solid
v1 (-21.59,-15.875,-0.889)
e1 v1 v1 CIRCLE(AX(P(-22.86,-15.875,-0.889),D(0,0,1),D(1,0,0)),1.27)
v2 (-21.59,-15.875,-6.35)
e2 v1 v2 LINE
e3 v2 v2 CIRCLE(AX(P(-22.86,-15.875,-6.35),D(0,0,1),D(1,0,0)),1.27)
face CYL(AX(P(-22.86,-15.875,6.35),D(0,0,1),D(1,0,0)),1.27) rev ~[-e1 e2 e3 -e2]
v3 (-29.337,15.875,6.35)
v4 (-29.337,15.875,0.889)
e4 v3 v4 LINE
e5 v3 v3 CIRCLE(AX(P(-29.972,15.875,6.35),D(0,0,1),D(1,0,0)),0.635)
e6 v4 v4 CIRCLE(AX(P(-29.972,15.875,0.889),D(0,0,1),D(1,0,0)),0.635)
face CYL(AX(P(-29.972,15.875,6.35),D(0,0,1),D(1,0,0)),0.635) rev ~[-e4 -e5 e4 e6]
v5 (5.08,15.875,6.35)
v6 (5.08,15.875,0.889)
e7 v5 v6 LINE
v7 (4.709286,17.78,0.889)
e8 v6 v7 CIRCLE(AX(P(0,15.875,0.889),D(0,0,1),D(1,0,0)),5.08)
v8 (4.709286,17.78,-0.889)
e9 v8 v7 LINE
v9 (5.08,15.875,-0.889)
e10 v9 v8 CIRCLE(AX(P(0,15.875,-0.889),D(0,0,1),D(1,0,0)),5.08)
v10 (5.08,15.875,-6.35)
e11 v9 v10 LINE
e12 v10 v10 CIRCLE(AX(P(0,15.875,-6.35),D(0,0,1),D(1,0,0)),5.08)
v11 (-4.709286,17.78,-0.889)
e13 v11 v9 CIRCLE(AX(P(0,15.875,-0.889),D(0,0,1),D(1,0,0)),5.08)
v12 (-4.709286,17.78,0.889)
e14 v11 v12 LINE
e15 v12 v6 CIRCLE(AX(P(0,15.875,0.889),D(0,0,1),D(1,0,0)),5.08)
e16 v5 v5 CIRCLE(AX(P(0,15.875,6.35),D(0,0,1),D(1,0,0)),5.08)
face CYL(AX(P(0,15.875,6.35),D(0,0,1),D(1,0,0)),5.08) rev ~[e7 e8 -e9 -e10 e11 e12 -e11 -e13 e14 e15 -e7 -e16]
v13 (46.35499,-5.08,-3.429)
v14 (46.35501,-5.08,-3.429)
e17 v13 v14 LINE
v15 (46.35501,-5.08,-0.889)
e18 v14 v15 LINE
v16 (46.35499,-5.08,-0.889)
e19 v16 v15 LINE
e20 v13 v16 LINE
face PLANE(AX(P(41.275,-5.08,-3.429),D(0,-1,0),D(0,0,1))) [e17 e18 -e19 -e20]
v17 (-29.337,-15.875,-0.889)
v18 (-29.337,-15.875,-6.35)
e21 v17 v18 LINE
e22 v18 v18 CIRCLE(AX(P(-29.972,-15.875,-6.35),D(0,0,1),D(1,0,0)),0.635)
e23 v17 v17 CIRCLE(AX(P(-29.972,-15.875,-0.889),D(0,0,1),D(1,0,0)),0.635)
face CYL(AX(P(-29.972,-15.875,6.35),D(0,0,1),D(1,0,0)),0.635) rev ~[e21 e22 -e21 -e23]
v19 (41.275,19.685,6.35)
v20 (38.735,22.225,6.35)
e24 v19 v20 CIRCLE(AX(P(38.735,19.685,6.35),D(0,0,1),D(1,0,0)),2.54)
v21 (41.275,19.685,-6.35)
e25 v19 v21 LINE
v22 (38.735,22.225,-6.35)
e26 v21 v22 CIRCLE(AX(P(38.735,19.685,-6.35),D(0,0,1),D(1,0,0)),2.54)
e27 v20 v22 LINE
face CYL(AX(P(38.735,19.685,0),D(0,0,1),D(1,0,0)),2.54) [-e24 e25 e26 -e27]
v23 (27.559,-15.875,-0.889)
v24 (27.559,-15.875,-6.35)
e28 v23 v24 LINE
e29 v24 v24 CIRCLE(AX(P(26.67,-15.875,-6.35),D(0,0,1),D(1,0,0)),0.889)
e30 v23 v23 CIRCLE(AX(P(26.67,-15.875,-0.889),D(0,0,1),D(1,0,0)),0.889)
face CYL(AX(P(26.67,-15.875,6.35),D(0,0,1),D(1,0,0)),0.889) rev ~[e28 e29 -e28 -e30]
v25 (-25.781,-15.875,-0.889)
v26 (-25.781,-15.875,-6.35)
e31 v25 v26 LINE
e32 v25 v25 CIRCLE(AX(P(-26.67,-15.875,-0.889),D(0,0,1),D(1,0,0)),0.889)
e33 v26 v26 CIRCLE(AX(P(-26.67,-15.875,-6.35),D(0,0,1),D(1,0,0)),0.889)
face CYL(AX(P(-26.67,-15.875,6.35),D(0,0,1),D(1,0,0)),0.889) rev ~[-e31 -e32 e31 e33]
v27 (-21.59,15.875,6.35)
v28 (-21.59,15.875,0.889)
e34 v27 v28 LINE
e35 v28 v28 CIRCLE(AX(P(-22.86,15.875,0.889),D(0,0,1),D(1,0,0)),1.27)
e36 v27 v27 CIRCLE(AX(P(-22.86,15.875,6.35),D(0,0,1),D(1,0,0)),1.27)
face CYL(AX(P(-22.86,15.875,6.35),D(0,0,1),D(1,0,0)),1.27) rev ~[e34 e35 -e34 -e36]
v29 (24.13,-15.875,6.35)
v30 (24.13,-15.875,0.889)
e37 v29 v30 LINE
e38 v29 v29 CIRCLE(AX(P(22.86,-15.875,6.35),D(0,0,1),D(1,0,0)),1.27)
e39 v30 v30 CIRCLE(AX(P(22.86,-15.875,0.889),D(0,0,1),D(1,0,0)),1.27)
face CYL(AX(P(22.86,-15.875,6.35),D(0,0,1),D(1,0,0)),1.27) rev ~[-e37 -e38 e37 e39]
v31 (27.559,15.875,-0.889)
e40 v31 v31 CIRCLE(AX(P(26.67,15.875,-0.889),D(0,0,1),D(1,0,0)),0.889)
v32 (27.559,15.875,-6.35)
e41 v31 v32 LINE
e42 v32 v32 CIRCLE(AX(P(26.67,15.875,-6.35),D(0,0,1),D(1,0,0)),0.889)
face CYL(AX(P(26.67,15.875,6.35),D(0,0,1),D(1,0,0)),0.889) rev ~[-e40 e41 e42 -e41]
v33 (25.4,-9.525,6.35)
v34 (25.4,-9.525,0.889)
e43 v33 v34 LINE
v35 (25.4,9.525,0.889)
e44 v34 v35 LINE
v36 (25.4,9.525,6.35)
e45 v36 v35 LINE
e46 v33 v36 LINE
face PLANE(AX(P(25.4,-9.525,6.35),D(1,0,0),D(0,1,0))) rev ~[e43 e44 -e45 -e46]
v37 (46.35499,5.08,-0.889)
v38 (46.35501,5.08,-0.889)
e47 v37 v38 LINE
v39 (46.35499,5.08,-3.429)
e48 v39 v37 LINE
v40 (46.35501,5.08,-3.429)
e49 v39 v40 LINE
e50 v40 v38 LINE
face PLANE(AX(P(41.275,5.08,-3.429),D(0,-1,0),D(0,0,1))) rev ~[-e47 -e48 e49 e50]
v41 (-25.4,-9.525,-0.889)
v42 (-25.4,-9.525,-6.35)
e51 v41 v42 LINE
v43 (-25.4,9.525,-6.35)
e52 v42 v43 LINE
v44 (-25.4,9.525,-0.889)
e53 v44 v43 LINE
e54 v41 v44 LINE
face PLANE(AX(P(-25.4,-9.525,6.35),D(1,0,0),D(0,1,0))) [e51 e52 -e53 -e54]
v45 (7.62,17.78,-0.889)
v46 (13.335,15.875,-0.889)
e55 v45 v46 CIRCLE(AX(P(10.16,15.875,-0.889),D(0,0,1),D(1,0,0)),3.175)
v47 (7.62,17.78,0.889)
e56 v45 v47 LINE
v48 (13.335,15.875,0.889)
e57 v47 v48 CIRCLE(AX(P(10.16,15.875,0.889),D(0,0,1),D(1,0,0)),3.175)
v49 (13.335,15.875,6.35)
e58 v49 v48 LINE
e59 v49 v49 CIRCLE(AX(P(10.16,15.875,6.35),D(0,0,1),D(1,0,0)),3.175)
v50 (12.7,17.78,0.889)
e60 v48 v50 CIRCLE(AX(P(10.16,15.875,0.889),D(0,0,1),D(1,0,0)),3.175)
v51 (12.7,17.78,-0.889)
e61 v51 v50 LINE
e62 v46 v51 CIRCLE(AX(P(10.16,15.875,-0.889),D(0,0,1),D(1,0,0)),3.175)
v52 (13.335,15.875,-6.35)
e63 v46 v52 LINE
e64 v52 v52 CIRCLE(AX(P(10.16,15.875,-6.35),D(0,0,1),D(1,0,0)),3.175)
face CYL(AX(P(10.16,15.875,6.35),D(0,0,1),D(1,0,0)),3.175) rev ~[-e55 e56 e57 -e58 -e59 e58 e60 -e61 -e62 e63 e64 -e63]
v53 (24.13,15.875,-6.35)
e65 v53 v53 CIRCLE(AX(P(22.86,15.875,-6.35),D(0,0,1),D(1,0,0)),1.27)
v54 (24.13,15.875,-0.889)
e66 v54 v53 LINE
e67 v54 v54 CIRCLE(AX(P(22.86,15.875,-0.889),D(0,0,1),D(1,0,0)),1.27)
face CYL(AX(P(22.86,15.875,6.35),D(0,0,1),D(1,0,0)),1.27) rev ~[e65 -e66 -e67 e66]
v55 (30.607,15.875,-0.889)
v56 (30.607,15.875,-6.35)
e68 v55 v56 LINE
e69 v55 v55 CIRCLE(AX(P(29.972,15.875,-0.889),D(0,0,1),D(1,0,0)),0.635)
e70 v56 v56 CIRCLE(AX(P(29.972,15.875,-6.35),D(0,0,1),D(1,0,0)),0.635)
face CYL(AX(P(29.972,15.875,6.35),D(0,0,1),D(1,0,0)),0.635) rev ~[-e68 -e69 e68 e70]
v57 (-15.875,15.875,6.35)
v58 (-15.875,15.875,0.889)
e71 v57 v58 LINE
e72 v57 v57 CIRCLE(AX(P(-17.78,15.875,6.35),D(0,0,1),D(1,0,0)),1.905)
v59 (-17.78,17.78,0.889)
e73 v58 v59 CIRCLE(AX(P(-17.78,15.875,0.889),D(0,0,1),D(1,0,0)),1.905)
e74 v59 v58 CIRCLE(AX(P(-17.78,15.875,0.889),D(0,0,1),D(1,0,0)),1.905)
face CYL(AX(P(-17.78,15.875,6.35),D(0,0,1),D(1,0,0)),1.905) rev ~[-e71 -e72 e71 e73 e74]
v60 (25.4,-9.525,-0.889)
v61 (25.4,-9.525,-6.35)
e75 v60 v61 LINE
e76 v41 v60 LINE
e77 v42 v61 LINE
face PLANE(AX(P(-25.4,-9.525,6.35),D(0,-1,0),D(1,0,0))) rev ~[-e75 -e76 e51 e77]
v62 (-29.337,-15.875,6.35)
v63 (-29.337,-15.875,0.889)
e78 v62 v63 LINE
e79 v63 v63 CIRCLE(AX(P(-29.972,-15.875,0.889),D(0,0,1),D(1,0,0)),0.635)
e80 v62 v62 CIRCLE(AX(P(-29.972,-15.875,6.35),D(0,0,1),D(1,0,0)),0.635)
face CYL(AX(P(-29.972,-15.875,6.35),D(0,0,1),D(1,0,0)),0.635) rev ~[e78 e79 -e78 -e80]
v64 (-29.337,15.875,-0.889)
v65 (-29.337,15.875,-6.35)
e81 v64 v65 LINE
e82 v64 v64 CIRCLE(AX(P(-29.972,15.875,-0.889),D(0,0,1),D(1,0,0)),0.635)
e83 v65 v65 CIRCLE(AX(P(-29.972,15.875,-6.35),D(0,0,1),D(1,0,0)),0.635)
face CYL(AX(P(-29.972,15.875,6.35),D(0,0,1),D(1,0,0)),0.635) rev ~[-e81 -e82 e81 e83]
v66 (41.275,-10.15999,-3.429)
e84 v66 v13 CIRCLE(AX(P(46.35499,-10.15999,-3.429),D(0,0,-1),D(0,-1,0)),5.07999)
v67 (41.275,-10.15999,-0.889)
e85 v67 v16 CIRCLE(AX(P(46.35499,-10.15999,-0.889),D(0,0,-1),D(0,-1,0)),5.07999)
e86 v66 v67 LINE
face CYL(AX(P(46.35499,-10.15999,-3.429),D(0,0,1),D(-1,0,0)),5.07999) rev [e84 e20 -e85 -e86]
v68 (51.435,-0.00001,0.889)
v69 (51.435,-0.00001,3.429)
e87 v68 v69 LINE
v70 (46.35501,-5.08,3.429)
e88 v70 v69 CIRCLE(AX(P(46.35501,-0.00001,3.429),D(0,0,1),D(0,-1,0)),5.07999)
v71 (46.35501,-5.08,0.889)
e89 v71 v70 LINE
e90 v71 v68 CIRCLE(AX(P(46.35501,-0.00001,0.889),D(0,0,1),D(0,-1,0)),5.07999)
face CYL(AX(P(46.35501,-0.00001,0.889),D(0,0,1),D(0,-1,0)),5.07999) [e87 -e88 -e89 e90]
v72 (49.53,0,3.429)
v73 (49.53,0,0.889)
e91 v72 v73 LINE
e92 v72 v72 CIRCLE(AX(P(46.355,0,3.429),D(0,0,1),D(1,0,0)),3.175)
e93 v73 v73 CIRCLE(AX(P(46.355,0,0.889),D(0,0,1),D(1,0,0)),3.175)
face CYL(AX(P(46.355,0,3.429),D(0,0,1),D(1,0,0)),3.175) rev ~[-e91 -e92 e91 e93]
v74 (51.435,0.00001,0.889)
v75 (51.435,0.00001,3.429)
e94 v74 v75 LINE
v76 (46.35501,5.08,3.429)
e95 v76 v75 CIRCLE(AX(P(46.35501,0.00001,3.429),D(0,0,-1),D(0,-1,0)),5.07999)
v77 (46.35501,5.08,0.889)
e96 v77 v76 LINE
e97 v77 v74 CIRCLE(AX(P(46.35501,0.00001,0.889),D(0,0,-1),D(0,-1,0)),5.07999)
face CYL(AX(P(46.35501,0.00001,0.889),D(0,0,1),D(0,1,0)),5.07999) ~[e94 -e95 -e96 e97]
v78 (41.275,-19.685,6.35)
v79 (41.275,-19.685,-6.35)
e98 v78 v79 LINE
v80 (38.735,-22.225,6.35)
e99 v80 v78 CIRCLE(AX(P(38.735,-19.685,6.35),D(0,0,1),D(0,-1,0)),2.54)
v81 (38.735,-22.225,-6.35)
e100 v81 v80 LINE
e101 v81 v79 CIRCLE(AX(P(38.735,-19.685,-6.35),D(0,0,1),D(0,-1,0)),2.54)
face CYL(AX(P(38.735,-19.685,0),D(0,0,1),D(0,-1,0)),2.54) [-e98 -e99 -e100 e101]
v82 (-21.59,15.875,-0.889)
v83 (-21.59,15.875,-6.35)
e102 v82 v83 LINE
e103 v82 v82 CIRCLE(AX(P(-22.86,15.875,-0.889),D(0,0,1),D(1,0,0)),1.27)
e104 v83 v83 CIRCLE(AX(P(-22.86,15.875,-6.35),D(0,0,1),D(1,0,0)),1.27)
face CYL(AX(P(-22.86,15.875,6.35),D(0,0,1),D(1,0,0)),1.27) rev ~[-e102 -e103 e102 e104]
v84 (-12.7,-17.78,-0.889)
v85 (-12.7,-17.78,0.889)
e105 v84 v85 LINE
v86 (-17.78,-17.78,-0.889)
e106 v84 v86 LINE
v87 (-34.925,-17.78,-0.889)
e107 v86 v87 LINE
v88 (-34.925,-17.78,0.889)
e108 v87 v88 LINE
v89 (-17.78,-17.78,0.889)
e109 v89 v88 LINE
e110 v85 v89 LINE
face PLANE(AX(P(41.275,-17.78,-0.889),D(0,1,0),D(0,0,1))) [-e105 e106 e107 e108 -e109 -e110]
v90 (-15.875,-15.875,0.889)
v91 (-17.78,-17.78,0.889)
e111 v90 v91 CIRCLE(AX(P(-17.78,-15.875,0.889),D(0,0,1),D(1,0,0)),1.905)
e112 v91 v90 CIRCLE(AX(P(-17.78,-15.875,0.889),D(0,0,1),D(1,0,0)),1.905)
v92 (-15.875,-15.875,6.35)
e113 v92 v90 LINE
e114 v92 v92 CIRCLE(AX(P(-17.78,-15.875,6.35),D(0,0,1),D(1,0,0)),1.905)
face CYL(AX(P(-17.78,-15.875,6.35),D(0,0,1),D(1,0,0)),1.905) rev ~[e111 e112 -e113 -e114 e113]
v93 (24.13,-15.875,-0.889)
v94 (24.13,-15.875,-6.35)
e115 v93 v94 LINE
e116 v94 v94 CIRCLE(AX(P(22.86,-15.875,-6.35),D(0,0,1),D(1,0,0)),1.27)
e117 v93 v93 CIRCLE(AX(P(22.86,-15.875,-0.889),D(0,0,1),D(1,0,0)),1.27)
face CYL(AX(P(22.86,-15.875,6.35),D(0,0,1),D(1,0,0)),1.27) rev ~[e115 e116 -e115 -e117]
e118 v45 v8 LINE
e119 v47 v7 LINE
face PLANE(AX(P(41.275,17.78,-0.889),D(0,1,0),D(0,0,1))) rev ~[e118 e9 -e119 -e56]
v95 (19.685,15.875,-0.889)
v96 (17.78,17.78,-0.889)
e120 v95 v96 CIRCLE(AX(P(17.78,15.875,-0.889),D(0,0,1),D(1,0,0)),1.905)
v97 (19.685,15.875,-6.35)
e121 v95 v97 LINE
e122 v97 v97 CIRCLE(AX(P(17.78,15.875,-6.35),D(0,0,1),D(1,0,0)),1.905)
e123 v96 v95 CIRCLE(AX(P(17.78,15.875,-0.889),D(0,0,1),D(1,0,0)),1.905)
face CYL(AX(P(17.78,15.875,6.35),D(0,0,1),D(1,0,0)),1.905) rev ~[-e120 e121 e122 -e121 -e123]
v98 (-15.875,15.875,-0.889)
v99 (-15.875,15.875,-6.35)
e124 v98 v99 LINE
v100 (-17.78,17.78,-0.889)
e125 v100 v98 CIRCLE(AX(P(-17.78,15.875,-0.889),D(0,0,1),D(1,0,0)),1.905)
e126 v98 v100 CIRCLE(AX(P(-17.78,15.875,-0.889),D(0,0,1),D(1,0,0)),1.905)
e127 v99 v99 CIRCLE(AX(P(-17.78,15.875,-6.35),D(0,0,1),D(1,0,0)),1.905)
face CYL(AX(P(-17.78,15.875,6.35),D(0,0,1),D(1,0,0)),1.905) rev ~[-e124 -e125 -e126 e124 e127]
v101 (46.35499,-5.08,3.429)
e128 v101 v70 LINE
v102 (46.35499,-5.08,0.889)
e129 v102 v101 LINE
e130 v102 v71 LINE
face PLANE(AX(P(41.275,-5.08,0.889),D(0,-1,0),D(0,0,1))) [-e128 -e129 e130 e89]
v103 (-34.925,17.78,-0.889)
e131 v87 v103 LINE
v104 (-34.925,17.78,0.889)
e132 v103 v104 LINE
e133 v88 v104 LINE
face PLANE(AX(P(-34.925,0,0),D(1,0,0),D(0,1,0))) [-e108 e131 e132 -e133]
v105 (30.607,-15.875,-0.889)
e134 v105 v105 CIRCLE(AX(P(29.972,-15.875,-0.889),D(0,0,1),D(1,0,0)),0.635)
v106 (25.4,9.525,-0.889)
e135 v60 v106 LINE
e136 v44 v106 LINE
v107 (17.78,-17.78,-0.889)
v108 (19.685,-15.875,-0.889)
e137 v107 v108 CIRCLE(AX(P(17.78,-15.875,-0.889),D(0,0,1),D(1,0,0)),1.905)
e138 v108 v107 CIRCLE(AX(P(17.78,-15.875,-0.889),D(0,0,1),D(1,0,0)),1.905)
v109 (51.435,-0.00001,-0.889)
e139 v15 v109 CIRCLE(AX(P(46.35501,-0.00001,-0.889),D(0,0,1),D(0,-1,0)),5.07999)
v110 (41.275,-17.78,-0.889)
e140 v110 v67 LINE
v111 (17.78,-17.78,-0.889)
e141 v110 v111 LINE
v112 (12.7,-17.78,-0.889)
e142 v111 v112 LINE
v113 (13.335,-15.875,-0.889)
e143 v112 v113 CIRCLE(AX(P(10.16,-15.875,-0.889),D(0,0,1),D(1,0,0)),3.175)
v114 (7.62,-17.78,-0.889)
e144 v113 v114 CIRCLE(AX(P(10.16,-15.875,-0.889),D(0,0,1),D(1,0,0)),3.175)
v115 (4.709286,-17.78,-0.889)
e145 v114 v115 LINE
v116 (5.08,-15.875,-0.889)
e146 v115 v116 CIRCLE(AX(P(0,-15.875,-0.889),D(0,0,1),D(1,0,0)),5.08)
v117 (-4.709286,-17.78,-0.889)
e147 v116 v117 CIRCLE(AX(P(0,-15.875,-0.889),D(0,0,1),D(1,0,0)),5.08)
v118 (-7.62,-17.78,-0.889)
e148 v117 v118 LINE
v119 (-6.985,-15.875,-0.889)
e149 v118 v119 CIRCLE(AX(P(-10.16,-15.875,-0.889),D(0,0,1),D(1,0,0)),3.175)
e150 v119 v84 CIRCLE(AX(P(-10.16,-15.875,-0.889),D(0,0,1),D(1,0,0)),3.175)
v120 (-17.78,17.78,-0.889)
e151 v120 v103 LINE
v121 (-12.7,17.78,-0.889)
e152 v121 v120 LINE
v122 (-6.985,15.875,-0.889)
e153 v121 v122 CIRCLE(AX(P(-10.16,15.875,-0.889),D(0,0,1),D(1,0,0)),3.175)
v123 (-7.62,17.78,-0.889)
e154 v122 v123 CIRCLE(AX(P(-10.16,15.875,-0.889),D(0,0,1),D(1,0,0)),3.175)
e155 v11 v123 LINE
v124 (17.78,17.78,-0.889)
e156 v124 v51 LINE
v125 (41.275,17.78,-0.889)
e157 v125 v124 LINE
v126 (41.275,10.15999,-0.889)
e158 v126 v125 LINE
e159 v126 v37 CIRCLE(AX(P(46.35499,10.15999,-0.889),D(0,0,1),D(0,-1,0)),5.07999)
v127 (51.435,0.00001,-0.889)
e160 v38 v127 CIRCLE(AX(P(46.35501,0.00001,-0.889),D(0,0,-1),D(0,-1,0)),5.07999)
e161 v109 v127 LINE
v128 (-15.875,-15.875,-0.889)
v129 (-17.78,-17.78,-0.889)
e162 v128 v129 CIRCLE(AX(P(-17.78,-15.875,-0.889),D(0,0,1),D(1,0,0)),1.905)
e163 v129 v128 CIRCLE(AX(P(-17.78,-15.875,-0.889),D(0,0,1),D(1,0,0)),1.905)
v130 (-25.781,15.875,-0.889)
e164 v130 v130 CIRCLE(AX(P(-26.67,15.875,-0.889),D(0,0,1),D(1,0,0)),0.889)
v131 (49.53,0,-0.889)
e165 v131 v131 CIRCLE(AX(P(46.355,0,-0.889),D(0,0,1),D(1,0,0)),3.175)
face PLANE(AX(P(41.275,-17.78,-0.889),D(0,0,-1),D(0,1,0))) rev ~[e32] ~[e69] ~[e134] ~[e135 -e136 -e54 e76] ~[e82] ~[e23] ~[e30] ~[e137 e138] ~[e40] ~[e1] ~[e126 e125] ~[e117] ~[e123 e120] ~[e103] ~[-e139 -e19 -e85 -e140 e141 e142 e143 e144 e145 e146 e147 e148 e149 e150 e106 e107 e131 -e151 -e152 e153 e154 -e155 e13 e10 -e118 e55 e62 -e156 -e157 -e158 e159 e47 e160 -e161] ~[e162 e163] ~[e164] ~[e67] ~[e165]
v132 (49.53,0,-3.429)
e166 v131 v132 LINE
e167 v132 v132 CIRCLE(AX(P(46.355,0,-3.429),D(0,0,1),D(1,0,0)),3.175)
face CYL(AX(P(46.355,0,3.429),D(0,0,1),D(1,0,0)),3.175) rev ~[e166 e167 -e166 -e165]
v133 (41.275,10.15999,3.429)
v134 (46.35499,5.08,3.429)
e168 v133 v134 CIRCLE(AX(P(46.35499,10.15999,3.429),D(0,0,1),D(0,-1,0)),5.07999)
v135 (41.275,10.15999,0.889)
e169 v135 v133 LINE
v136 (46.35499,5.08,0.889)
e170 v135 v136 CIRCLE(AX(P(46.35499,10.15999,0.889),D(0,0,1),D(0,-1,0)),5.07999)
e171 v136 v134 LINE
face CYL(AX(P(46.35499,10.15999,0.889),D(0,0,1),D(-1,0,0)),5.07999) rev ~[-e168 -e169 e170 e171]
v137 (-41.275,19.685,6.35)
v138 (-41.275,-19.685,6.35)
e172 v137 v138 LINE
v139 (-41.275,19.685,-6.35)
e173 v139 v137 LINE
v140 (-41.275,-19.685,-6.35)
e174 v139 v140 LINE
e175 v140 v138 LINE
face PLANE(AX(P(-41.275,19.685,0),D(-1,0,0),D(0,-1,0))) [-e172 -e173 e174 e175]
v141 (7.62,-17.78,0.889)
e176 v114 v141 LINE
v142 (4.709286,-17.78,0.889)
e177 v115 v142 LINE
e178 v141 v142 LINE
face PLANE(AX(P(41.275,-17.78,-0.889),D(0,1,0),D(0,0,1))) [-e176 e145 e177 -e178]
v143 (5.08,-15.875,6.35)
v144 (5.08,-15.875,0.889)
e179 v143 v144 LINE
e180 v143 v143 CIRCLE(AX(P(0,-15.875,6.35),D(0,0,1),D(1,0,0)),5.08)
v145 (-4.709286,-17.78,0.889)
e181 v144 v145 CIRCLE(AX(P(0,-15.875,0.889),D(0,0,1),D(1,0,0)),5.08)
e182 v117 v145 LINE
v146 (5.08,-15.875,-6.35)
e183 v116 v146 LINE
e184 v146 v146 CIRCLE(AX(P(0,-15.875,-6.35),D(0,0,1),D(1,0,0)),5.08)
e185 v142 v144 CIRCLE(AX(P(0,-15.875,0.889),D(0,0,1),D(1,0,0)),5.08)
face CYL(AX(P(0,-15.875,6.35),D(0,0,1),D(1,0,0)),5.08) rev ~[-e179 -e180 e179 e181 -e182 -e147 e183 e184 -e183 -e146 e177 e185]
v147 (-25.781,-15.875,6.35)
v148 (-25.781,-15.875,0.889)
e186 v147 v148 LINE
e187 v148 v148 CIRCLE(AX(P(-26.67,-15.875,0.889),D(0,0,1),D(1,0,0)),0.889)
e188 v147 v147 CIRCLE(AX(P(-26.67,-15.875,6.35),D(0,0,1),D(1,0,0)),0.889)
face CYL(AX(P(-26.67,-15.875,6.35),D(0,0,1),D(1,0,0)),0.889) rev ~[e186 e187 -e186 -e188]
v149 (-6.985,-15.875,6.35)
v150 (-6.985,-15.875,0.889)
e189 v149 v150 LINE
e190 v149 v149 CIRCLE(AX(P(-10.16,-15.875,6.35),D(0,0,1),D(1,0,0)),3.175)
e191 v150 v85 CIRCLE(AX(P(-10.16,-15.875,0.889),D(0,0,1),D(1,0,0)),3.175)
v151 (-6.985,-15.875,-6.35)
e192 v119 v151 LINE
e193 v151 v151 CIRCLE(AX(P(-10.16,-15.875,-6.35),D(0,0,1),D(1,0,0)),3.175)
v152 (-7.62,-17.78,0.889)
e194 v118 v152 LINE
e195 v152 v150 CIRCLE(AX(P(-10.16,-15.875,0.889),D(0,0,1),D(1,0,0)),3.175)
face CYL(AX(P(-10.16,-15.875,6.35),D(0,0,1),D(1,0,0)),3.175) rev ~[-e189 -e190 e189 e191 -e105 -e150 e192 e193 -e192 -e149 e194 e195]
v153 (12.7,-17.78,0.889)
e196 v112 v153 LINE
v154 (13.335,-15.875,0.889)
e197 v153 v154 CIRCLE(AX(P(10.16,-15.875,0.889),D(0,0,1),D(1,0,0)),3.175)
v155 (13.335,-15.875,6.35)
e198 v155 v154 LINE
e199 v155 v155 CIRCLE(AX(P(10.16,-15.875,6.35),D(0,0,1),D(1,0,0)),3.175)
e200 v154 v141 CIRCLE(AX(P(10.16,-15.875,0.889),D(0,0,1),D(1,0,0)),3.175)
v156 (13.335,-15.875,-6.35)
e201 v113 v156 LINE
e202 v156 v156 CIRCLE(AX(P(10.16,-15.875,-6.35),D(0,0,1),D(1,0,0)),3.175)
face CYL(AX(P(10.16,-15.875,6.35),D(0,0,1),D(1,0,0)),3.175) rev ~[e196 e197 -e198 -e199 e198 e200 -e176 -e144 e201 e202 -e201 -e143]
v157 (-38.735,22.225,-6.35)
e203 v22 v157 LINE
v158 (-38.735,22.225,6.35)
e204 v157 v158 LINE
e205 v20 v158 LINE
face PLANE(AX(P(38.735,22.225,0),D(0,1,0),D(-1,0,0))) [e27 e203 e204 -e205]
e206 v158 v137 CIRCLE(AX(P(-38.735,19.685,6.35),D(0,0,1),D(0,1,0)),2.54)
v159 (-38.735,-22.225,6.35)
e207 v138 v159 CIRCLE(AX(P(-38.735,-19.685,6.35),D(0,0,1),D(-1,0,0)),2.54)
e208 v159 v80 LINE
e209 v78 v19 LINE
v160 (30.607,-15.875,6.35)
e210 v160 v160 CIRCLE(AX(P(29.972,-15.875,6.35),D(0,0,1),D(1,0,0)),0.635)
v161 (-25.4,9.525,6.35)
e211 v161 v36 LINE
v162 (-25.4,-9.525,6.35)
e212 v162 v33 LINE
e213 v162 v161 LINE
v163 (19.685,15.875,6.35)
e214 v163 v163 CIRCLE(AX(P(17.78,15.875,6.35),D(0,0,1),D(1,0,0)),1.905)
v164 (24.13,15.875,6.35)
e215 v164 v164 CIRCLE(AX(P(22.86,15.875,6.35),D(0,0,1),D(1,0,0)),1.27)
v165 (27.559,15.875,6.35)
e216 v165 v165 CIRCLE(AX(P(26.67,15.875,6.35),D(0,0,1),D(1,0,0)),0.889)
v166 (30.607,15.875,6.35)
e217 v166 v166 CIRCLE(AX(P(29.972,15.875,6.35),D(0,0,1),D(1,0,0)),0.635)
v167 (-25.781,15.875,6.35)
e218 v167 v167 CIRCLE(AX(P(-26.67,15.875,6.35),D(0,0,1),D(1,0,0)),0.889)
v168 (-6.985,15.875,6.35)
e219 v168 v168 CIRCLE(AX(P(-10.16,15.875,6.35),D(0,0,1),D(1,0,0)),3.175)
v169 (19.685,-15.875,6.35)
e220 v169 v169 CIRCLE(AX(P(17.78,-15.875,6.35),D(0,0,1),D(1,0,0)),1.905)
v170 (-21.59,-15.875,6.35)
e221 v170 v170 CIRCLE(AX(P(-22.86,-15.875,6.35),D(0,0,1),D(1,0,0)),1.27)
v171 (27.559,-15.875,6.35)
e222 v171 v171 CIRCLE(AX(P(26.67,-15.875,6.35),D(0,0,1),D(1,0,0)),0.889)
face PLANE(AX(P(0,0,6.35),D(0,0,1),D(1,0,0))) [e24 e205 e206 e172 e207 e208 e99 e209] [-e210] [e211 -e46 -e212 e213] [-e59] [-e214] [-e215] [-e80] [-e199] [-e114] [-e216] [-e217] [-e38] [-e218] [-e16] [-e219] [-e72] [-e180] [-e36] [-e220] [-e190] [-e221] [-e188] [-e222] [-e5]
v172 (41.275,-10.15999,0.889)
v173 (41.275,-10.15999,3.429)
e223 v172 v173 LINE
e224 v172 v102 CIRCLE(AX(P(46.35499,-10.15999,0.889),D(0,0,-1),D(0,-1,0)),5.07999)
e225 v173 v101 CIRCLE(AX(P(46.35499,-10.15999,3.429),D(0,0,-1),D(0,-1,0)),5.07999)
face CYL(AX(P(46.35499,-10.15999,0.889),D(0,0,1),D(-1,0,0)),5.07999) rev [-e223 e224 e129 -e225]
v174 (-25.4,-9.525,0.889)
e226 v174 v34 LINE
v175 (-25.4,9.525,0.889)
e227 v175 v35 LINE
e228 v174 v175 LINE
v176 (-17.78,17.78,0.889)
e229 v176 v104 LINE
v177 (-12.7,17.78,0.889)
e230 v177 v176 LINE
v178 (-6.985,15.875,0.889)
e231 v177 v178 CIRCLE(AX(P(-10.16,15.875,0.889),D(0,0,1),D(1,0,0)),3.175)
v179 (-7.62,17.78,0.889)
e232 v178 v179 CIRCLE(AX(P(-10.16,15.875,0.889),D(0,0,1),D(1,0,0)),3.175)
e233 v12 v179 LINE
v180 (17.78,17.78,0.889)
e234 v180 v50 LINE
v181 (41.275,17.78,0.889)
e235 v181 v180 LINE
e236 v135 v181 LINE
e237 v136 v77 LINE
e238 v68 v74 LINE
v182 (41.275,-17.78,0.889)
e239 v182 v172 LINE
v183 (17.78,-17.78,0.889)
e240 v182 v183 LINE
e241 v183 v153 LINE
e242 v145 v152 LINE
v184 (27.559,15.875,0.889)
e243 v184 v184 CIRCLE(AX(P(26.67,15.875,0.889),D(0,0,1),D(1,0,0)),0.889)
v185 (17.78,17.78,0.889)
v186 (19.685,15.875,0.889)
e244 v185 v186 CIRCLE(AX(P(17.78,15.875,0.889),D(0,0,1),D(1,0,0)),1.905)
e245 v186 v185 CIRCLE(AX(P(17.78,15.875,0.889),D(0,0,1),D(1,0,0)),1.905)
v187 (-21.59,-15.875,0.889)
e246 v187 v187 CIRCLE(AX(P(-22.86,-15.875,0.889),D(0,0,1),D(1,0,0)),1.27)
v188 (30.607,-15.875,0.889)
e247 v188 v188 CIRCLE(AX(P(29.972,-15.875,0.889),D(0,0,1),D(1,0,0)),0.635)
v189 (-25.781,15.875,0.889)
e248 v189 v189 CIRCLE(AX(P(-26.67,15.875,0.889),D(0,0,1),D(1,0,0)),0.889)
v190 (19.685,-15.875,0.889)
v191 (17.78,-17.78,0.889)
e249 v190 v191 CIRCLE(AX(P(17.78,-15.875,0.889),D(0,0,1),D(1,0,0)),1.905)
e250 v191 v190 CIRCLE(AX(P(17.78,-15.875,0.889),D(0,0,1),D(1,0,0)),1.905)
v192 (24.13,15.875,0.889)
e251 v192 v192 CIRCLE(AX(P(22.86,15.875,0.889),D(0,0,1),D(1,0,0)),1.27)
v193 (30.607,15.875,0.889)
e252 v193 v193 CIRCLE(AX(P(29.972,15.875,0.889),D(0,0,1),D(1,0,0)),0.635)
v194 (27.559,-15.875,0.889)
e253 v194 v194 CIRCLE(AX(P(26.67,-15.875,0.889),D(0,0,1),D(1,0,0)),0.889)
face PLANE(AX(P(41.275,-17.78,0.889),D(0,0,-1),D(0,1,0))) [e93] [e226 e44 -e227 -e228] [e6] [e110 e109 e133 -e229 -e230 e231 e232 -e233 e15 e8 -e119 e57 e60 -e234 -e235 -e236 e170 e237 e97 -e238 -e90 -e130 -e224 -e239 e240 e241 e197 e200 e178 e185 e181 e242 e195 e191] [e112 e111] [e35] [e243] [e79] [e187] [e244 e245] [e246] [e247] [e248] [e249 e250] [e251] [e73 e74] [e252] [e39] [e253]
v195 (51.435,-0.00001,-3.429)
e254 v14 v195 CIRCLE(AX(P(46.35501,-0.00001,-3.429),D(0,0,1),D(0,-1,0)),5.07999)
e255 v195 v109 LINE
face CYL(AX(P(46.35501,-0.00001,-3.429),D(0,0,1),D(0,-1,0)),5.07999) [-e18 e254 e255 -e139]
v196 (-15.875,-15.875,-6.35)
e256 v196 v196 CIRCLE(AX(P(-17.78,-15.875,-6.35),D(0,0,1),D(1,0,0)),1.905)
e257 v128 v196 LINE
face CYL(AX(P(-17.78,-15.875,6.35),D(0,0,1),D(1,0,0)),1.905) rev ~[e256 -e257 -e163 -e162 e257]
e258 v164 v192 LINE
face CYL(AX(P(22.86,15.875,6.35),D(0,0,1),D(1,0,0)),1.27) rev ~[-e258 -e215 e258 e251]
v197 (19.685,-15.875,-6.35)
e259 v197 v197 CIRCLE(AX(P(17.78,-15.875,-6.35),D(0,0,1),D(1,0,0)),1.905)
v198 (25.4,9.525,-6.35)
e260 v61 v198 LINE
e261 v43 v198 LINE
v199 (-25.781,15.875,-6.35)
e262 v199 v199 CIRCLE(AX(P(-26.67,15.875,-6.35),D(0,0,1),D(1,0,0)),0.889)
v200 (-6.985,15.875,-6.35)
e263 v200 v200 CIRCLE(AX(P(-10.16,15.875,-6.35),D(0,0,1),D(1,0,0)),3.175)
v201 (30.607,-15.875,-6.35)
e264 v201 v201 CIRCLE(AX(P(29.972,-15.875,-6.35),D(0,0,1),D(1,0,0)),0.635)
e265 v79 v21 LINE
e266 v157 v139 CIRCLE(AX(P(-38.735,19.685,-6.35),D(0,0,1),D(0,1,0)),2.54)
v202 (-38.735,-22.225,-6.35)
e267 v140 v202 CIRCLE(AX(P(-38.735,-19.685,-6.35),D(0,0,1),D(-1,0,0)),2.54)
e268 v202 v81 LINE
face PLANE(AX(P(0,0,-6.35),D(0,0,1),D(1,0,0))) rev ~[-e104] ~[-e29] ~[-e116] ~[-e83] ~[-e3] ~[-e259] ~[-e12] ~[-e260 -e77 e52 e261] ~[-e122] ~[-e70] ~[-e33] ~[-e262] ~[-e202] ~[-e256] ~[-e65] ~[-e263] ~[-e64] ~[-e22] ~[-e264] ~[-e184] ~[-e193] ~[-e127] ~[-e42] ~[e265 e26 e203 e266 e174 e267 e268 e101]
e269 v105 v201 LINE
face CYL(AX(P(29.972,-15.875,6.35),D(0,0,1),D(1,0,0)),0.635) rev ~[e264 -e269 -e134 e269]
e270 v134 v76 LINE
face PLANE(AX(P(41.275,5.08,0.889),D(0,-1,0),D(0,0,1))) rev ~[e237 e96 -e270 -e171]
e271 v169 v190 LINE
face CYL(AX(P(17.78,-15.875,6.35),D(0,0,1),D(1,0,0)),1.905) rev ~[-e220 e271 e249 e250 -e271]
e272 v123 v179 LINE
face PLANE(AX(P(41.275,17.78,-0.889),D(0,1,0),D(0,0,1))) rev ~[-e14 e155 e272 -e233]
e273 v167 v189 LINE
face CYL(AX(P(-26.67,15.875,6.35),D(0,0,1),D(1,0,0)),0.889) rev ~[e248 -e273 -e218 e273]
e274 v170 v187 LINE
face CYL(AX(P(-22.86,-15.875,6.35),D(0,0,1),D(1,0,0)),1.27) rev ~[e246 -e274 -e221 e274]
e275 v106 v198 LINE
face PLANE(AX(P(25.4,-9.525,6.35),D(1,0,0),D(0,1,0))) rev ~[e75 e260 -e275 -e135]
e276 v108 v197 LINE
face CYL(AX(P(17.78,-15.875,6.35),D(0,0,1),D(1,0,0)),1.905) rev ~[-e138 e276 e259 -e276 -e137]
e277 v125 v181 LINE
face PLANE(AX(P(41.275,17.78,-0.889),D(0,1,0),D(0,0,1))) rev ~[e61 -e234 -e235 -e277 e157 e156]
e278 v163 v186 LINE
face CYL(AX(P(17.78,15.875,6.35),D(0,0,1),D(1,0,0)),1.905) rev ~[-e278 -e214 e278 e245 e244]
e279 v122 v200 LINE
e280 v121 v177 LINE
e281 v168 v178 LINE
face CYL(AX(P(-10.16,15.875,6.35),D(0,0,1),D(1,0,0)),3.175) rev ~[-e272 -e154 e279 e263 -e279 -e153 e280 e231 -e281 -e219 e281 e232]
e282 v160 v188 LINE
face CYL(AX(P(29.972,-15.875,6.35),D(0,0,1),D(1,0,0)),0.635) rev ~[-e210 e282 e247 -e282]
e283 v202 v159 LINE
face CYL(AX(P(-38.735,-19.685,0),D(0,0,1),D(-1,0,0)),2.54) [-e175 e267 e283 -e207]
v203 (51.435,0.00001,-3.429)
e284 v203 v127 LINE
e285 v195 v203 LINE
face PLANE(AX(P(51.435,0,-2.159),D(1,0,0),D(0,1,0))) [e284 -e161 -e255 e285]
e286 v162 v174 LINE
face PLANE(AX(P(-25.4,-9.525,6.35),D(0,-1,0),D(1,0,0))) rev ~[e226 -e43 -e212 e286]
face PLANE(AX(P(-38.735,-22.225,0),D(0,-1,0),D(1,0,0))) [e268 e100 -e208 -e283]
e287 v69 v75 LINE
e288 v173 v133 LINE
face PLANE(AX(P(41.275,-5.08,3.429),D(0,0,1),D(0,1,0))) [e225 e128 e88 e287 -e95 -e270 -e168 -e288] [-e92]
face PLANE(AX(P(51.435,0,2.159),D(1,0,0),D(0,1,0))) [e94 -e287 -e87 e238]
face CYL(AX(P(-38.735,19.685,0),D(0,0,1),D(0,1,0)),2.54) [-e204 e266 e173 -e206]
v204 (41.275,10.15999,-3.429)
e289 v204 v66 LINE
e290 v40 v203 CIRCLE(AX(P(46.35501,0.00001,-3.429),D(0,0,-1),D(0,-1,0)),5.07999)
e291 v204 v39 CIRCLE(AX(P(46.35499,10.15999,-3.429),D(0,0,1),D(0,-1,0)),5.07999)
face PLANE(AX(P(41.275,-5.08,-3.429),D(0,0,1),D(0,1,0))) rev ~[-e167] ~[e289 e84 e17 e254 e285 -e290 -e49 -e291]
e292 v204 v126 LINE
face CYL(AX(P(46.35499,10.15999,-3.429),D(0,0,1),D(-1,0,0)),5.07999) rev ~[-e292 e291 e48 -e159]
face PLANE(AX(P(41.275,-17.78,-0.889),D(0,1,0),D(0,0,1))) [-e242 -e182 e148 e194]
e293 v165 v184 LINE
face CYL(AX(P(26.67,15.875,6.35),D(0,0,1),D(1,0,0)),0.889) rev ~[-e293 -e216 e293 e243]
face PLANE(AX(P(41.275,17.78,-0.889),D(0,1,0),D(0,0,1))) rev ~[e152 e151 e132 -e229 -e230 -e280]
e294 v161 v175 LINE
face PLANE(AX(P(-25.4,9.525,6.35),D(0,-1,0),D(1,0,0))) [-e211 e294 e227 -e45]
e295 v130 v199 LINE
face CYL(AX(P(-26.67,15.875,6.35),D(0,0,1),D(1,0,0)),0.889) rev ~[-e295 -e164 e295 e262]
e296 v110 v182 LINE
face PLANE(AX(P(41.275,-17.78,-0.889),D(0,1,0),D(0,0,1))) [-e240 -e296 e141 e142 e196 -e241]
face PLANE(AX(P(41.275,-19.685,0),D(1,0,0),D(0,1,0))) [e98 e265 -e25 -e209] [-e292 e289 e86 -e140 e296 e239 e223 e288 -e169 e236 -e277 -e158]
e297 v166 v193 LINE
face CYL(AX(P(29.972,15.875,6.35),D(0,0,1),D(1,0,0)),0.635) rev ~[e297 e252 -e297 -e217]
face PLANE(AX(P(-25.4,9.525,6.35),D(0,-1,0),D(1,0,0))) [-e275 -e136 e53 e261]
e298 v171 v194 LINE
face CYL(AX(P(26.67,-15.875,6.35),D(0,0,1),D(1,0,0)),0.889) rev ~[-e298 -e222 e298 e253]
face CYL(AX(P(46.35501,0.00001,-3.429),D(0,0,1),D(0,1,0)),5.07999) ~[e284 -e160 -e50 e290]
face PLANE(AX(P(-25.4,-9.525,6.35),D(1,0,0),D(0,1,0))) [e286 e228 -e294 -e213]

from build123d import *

# Parameters (mm, degrees)
F1_DEPTH  = 6.35
F2_W      = 50.8
F2_H      = 19.05
F2_R      = 5.08
F2_R_2    = 3.175
F2_R_3    = 0.635
F2_R_4    = 1.905
F2_R_5    = 1.27
F2_R_6    = 0.889
F3_DEPTH  = 12.7
F4_W      = 35.56
F4_H      = 1.778
F5_DEPTH  = 76.2
F6_W      = 10.16
F6_H      = 2.54
F7_DEPTH  = 10.16
F8_R      = 5.07999
F9_R      = 3.175
F10_DEPTH = 25.4


# Not quite as in the source:
# - a fillet or chamfer is up to 0.001 mm smaller than in the source, because OpenCascade refuses the exact size


with BuildPart() as f1:
    # F0 (on Top) → F1 (new body, symmetric)
    with BuildSketch(Plane.XY):
        with BuildLine():
            Line((38.735, 22.225), (-38.735, 22.225))
            ThreePointArc((-38.735, 22.225), (-40.5310512242, 21.4810512242), (-41.275, 19.685))
            Line((-41.275, 19.685), (-41.275, -19.685))
            ThreePointArc((-41.275, -19.685), (-40.5310512242, -21.4810512242), (-38.735, -22.225))
            Line((-38.735, -22.225), (38.735, -22.225))
            ThreePointArc((38.735, -22.225), (40.5310512242, -21.4810512242), (41.275, -19.685))
            Line((41.275, -19.685), (41.275, 19.685))
            ThreePointArc((41.275, 19.685), (40.5310512242, 21.4810512242), (38.735, 22.225))
        make_face()
    extrude(amount=F1_DEPTH, both=True)

    # F2 (on face) → F3 (cut, through all)
    with BuildSketch(Plane.XY.offset(6.35)):
        Rectangle(F2_W, F2_H)
        with Locations((0, 15.875)):
            Circle(F2_R)
        with Locations((-10.16, 15.875)):
            Circle(F2_R_2)
        with Locations((-29.972, 15.875)):
            Circle(F2_R_3)
        with Locations((-17.78, 15.875)):
            Circle(F2_R_4)
        with Locations((-22.86, 15.875)):
            Circle(F2_R_5)
        with Locations((-26.67, 15.875)):
            Circle(F2_R_6)
        with Locations((29.972, 15.875)):
            Circle(F2_R_3)
        with Locations((22.86, 15.875)):
            Circle(F2_R_5)
        with Locations((26.67, 15.875)):
            Circle(F2_R_6)
        with Locations((17.78, 15.875)):
            Circle(F2_R_4)
        with Locations((10.16, 15.875)):
            Circle(F2_R_2)
        with Locations((29.972, -15.875)):
            Circle(F2_R_3)
        with Locations((0, -15.875)):
            Circle(F2_R)
        with Locations((26.67, -15.875)):
            Circle(F2_R_6)
        with Locations((-22.86, -15.875)):
            Circle(F2_R_5)
        with Locations((-29.972, -15.875)):
            Circle(F2_R_3)
        with Locations((22.86, -15.875)):
            Circle(F2_R_5)
        with Locations((17.78, -15.875)):
            Circle(F2_R_4)
        with Locations((-26.67, -15.875)):
            Circle(F2_R_6)
        with Locations((-10.16, -15.875)):
            Circle(F2_R_2)
        with Locations((10.16, -15.875)):
            Circle(F2_R_2)
        with Locations((-17.78, -15.875)):
            Circle(F2_R_4)
    extrude(amount=-F3_DEPTH, mode=Mode.SUBTRACT)

    # F4 (on face) → F5 (cut)
    with BuildSketch(Plane.YZ.offset(41.275)):
        Rectangle(F4_W, F4_H)
    extrude(amount=-F5_DEPTH, mode=Mode.SUBTRACT)

    # F6 (on face) → F7 (join)
    with BuildSketch(Plane.YZ.offset(41.275)):
        with Locations((0, 2.159)):
            Rectangle(F6_W, F6_H)
        with Locations((0, -2.159)):
            Rectangle(F6_W, F6_H)
    extrude(amount=F7_DEPTH)

    # F8 (radius 5.08 in the source; OpenCascade refuses exactly that, so slightly less here)
    f8_edges = [f1.edges().sort_by_distance(p)[0] for p in [
        (51.435, -5.08, 2.159),
        (51.435, 5.08, 2.159),
        (51.435, 5.08, -2.159),
        (51.435, -5.08, -2.159),
        (41.275, -5.08, 2.159),
        (41.275, -5.08, -2.159),
        (41.275, 5.08, 2.159),
        (41.275, 5.08, -2.159),
    ]]
    fillet(f8_edges, radius=F8_R)

    # F9 (on face) → F10 (cut)
    with BuildSketch(Plane.XY.offset(3.429)):
        with Locations((46.355, 0)):
            Circle(F9_R)
    extrude(amount=-F10_DEPTH, mode=Mode.SUBTRACT)


solid = f1.part
